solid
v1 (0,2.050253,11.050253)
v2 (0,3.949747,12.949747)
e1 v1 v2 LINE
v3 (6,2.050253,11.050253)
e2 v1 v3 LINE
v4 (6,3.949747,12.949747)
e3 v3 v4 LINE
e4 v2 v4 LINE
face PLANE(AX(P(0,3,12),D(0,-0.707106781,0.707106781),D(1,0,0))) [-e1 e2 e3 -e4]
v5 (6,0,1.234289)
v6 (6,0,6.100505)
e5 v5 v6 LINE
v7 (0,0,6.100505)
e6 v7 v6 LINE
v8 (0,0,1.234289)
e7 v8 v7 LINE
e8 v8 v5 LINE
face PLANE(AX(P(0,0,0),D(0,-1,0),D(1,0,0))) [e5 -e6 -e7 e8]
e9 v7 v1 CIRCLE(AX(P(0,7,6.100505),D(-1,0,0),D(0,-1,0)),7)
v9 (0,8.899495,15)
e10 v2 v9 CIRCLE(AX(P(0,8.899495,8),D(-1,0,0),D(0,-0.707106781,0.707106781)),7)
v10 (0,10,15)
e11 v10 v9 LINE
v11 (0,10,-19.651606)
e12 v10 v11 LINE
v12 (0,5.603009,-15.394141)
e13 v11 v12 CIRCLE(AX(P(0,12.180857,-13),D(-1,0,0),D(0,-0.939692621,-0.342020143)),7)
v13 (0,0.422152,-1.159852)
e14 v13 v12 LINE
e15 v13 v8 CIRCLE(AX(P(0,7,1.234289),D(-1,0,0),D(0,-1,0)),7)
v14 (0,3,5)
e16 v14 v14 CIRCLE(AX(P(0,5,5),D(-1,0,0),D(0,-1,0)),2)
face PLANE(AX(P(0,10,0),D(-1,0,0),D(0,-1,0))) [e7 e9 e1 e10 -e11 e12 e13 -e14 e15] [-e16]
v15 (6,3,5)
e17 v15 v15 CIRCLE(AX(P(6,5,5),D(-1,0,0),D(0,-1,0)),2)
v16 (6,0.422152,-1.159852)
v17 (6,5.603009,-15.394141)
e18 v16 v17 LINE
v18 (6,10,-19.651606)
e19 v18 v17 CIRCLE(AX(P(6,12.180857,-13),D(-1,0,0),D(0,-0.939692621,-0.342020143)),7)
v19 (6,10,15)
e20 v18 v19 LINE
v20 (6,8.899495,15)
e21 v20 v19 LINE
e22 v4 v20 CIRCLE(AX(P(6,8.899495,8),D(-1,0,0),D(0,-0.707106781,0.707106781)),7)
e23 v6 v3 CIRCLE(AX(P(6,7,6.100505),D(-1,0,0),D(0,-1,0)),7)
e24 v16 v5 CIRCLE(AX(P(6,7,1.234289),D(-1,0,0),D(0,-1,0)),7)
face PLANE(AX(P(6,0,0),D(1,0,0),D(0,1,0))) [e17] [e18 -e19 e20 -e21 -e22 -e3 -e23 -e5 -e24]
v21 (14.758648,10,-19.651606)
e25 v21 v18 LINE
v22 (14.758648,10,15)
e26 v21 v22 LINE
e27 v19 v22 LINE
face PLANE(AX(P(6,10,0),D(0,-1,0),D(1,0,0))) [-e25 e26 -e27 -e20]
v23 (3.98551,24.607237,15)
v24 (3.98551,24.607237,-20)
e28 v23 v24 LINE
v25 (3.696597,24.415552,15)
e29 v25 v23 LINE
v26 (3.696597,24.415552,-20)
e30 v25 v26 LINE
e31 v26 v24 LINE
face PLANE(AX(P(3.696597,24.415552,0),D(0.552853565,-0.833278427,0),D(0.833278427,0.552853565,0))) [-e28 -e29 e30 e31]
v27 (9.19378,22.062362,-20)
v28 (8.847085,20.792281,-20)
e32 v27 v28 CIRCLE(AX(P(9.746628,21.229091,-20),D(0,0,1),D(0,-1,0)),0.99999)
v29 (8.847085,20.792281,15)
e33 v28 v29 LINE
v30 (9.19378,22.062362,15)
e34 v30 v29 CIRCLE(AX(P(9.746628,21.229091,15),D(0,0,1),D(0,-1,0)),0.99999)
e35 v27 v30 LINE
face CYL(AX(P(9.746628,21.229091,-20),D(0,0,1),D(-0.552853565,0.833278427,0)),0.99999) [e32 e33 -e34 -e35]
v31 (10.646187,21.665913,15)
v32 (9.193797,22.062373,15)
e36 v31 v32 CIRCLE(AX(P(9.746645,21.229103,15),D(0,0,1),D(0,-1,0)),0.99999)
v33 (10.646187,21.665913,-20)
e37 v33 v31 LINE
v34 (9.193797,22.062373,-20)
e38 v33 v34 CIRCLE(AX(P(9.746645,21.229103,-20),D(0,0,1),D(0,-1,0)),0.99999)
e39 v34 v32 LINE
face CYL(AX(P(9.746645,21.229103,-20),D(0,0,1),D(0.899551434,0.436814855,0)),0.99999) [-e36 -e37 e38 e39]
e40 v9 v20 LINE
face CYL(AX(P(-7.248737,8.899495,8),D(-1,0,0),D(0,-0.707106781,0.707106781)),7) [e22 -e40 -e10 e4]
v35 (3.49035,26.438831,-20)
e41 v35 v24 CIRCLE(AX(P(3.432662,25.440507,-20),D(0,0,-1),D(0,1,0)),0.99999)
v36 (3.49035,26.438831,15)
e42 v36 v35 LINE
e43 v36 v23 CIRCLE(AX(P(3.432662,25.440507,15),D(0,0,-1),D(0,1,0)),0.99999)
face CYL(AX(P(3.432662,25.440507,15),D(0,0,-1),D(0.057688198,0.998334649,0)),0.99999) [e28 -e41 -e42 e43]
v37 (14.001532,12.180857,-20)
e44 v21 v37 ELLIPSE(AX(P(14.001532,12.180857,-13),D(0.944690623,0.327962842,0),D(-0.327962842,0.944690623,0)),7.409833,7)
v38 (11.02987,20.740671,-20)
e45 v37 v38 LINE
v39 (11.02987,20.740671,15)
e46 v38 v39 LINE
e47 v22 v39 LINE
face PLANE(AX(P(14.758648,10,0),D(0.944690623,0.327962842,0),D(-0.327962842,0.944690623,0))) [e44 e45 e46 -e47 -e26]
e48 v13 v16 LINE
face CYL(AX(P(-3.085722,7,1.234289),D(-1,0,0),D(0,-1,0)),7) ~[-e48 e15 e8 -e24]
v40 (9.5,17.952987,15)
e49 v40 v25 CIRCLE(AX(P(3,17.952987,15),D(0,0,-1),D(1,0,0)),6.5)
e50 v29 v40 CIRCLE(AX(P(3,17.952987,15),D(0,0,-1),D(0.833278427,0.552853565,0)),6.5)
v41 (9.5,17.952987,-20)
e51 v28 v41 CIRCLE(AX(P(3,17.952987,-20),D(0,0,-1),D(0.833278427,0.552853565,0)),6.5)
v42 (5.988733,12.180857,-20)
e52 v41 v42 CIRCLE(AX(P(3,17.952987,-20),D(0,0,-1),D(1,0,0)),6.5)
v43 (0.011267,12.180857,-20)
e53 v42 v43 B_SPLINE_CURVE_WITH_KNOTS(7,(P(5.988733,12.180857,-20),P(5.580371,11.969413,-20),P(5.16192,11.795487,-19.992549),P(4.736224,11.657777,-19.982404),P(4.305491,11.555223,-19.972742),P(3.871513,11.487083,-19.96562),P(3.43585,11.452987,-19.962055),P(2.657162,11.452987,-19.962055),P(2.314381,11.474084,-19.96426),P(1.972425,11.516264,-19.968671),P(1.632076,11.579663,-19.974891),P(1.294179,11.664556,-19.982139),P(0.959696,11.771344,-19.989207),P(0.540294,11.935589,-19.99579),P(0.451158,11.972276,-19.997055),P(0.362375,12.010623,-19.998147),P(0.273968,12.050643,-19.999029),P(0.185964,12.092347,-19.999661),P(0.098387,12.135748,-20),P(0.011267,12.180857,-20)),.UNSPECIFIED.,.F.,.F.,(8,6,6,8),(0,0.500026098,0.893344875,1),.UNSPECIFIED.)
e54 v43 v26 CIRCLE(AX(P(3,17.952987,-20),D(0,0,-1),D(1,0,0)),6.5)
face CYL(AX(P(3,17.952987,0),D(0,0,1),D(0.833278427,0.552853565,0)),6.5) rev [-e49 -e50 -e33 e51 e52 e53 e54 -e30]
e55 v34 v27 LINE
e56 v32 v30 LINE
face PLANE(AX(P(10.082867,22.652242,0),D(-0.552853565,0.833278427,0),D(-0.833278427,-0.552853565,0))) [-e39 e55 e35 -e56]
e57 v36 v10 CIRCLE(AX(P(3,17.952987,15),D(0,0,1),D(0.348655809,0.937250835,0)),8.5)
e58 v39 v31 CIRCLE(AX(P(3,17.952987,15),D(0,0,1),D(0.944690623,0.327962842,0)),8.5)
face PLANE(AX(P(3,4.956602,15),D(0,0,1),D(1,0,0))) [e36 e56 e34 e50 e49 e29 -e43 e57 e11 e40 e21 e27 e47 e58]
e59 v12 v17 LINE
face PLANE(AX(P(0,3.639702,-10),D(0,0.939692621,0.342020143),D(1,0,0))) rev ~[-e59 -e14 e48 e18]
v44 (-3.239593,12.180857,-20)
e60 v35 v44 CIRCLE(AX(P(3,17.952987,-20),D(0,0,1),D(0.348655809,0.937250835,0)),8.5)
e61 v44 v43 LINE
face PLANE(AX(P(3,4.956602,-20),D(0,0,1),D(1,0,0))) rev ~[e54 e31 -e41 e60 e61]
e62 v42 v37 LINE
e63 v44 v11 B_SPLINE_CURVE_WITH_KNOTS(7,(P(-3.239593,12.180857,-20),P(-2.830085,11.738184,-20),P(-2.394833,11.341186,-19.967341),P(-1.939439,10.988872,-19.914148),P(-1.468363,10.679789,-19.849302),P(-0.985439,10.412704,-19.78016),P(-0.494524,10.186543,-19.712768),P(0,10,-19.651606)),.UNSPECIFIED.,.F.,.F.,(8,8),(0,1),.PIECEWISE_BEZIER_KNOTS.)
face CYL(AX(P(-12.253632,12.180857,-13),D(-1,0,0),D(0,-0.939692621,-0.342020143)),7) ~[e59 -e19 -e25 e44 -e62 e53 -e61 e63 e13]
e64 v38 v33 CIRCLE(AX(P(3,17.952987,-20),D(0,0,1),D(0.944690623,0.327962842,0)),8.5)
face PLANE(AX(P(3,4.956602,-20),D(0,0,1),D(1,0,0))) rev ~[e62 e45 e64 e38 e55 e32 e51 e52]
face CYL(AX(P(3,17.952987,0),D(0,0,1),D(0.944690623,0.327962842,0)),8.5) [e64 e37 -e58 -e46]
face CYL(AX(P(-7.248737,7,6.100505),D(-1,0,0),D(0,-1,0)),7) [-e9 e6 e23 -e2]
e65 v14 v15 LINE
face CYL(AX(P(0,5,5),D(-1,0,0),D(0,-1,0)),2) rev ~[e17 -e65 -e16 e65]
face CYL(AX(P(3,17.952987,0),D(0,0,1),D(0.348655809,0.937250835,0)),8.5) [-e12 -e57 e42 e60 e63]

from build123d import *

# Parameters (mm, degrees)
F1_DEPTH      = 15
F1_DEPTH_BACK = 20
F2_R          = 2
F3_DEPTH      = 14.7596476454
F4_R          = 0.99999
F5_SIZE2      = 7.2794046853
F5_SIZE       = 20
F6_SIZE       = 6
F7_T1_DEPTH   = 20.4974746831
F7_T3_DEPTH   = 30.5072638373
F7_T5_DEPTH   = 12.1714443248


# Not quite as in the source:
# - a fillet or chamfer that OpenCascade refuses, or shapes differently, is made with other operations: its cross-section is extruded or revolved along the edge and cut away or added
# - a fillet or chamfer is up to 0.001 mm smaller than in the source, because OpenCascade refuses the exact size
# - a feature names something its author has since deleted; it is built from what else it names


with BuildPart() as f1:
    # F0 (on Top) → F1 (new body, two sides)
    with BuildSketch(Plane.XY) as f1_sk:
        with BuildLine():
            Line((0, 10), (0, 0))
            Line((0, 0), (6, 0))
            Line((6, 0), (6, 10))
            ThreePointArc((6, 10), (3, 9.4529868603), (0, 10))
        make_face()
        with BuildLine():
            ThreePointArc((11.5, 17.9529868603), (9.9910657271, 13.1182169588), (6, 10))
            Line((6, 10), (14.7586476454, 10))
            Line((14.7586476454, 10), (11.0298702995, 20.7406710197))
            ThreePointArc((11.0298702995, 20.7406710197), (11.3816435604, 19.3665112594), (11.5, 17.9529868603))
        make_face()
        with BuildLine():
            ThreePointArc((5.9635743738, 25.9196189549), (-4.9598303138, 20.9347818526), (0, 10))
            ThreePointArc((0, 10), (3, 9.4529868603), (6, 10))
            ThreePointArc((6, 10), (9.9910657271, 13.1182169588), (11.5, 17.9529868603))
            ThreePointArc((11.5, 17.9529868603), (11.3816435604, 19.3665112594), (11.0298702995, 20.7406710197))
            ThreePointArc((11.0298702995, 20.7406710197), (10.6165760284, 21.7262837746), (10.0828666254, 22.6522421594))
            Line((10.0828666254, 22.6522421594), (8.4163097724, 21.5465350302))
            ThreePointArc((8.4163097724, 21.5465350302), (9.2231830087, 19.8296842892), (9.5, 17.9529868603))
            ThreePointArc((9.5, 17.9529868603), (-1.83621149, 13.6100548526), (3.6965974081, 24.4155522991))
            Line((3.6965974081, 24.4155522991), (5.9635743738, 25.9196189549))
        make_face()
    extrude(amount=F1_DEPTH)
    extrude(f1_sk.sketch, amount=-F1_DEPTH_BACK)

    # F2 (on face) → F3 (cut, through all)
    with BuildSketch(Plane(origin=(0, 0, 0), x_dir=(0, -1, 0), z_dir=(-1, 0, 0))):
        with Locations((-5, 5)):
            Circle(F2_R)
    extrude(amount=-F3_DEPTH, mode=Mode.SUBTRACT)

    # F4 (radius 1 in the source; OpenCascade refuses exactly that, so slightly less here)
    f4_edges = [f1.edges().sort_by_distance(p)[0] for p in [
        (5.963574, 25.919619, -2.5),
        (8.41631, 21.546535, -2.5),
        (10.082867, 22.652242, -2.5),
    ]]
    fillet(f4_edges, radius=F4_R)

    # F5
    f5_edges = [f1.edges().sort_by_distance(p)[0] for p in [
        (3, 0, -20),
    ]]
    f5_side = f1.faces().sort_by_distance((3, 0, -2.5))[0]
    chamfer(f5_edges, length=F5_SIZE, length2=F5_SIZE2, reference=f5_side)

    # F6
    f6_edges = [f1.edges().sort_by_distance(p)[0] for p in [
        (3, 0, 15),
    ]]
    chamfer(f6_edges, length=F6_SIZE)

    # F7: fillet of radius 7 on 4 edges, made by hand

    # F7_s2 → F7_t1 (cut)
    with BuildSketch(Plane.YZ.offset(-7.2487373415)):
        with BuildLine():
            ThreePointArc((0, 6.1005050634), (0.5328432724, 8.7792890899), (2.0502525317, 11.0502525317))
            Line((2.0502525317, 11.0502525317), (0, 9))
            Line((0, 9), (0, 6.1005050634))
        make_face()
        with BuildLine():
            ThreePointArc((3.9497474683, 12.9497474683), (6.2207109101, 14.4671567276), (8.8994949366, 15))
            Line((8.8994949366, 15), (6, 15))
            Line((6, 15), (3.9497474683, 12.9497474683))
        make_face()
    extrude(amount=F7_T1_DEPTH, mode=Mode.SUBTRACT)

    # F7_s4 → F7_t3 (cut)
    with BuildSketch(Plane.YZ.offset(-12.2536319187)):
        with BuildLine():
            ThreePointArc((5.6030091073, -15.3941410033), (8.1658223983, -18.73406431), (12.1808574528, -20))
            Line((12.1808574528, -20), (7.2794046853, -20))
            Line((7.2794046853, -20), (5.6030091073, -15.3941410033))
        make_face()
    extrude(amount=F7_T3_DEPTH, mode=Mode.SUBTRACT)

    # F7_s6 → F7_t5 (cut)
    with BuildSketch(Plane.YZ.offset(-3.0857221624)):
        with BuildLine():
            ThreePointArc((0, 1.234288865), (0.1063457289, 0.0187516213), (0.4221516545, -1.1598521383))
            Line((0.4221516545, -1.1598521383), (0, 0))
            Line((0, 0), (0, 1.234288865))
        make_face()
    extrude(amount=F7_T5_DEPTH, mode=Mode.SUBTRACT)


solid = f1.part
